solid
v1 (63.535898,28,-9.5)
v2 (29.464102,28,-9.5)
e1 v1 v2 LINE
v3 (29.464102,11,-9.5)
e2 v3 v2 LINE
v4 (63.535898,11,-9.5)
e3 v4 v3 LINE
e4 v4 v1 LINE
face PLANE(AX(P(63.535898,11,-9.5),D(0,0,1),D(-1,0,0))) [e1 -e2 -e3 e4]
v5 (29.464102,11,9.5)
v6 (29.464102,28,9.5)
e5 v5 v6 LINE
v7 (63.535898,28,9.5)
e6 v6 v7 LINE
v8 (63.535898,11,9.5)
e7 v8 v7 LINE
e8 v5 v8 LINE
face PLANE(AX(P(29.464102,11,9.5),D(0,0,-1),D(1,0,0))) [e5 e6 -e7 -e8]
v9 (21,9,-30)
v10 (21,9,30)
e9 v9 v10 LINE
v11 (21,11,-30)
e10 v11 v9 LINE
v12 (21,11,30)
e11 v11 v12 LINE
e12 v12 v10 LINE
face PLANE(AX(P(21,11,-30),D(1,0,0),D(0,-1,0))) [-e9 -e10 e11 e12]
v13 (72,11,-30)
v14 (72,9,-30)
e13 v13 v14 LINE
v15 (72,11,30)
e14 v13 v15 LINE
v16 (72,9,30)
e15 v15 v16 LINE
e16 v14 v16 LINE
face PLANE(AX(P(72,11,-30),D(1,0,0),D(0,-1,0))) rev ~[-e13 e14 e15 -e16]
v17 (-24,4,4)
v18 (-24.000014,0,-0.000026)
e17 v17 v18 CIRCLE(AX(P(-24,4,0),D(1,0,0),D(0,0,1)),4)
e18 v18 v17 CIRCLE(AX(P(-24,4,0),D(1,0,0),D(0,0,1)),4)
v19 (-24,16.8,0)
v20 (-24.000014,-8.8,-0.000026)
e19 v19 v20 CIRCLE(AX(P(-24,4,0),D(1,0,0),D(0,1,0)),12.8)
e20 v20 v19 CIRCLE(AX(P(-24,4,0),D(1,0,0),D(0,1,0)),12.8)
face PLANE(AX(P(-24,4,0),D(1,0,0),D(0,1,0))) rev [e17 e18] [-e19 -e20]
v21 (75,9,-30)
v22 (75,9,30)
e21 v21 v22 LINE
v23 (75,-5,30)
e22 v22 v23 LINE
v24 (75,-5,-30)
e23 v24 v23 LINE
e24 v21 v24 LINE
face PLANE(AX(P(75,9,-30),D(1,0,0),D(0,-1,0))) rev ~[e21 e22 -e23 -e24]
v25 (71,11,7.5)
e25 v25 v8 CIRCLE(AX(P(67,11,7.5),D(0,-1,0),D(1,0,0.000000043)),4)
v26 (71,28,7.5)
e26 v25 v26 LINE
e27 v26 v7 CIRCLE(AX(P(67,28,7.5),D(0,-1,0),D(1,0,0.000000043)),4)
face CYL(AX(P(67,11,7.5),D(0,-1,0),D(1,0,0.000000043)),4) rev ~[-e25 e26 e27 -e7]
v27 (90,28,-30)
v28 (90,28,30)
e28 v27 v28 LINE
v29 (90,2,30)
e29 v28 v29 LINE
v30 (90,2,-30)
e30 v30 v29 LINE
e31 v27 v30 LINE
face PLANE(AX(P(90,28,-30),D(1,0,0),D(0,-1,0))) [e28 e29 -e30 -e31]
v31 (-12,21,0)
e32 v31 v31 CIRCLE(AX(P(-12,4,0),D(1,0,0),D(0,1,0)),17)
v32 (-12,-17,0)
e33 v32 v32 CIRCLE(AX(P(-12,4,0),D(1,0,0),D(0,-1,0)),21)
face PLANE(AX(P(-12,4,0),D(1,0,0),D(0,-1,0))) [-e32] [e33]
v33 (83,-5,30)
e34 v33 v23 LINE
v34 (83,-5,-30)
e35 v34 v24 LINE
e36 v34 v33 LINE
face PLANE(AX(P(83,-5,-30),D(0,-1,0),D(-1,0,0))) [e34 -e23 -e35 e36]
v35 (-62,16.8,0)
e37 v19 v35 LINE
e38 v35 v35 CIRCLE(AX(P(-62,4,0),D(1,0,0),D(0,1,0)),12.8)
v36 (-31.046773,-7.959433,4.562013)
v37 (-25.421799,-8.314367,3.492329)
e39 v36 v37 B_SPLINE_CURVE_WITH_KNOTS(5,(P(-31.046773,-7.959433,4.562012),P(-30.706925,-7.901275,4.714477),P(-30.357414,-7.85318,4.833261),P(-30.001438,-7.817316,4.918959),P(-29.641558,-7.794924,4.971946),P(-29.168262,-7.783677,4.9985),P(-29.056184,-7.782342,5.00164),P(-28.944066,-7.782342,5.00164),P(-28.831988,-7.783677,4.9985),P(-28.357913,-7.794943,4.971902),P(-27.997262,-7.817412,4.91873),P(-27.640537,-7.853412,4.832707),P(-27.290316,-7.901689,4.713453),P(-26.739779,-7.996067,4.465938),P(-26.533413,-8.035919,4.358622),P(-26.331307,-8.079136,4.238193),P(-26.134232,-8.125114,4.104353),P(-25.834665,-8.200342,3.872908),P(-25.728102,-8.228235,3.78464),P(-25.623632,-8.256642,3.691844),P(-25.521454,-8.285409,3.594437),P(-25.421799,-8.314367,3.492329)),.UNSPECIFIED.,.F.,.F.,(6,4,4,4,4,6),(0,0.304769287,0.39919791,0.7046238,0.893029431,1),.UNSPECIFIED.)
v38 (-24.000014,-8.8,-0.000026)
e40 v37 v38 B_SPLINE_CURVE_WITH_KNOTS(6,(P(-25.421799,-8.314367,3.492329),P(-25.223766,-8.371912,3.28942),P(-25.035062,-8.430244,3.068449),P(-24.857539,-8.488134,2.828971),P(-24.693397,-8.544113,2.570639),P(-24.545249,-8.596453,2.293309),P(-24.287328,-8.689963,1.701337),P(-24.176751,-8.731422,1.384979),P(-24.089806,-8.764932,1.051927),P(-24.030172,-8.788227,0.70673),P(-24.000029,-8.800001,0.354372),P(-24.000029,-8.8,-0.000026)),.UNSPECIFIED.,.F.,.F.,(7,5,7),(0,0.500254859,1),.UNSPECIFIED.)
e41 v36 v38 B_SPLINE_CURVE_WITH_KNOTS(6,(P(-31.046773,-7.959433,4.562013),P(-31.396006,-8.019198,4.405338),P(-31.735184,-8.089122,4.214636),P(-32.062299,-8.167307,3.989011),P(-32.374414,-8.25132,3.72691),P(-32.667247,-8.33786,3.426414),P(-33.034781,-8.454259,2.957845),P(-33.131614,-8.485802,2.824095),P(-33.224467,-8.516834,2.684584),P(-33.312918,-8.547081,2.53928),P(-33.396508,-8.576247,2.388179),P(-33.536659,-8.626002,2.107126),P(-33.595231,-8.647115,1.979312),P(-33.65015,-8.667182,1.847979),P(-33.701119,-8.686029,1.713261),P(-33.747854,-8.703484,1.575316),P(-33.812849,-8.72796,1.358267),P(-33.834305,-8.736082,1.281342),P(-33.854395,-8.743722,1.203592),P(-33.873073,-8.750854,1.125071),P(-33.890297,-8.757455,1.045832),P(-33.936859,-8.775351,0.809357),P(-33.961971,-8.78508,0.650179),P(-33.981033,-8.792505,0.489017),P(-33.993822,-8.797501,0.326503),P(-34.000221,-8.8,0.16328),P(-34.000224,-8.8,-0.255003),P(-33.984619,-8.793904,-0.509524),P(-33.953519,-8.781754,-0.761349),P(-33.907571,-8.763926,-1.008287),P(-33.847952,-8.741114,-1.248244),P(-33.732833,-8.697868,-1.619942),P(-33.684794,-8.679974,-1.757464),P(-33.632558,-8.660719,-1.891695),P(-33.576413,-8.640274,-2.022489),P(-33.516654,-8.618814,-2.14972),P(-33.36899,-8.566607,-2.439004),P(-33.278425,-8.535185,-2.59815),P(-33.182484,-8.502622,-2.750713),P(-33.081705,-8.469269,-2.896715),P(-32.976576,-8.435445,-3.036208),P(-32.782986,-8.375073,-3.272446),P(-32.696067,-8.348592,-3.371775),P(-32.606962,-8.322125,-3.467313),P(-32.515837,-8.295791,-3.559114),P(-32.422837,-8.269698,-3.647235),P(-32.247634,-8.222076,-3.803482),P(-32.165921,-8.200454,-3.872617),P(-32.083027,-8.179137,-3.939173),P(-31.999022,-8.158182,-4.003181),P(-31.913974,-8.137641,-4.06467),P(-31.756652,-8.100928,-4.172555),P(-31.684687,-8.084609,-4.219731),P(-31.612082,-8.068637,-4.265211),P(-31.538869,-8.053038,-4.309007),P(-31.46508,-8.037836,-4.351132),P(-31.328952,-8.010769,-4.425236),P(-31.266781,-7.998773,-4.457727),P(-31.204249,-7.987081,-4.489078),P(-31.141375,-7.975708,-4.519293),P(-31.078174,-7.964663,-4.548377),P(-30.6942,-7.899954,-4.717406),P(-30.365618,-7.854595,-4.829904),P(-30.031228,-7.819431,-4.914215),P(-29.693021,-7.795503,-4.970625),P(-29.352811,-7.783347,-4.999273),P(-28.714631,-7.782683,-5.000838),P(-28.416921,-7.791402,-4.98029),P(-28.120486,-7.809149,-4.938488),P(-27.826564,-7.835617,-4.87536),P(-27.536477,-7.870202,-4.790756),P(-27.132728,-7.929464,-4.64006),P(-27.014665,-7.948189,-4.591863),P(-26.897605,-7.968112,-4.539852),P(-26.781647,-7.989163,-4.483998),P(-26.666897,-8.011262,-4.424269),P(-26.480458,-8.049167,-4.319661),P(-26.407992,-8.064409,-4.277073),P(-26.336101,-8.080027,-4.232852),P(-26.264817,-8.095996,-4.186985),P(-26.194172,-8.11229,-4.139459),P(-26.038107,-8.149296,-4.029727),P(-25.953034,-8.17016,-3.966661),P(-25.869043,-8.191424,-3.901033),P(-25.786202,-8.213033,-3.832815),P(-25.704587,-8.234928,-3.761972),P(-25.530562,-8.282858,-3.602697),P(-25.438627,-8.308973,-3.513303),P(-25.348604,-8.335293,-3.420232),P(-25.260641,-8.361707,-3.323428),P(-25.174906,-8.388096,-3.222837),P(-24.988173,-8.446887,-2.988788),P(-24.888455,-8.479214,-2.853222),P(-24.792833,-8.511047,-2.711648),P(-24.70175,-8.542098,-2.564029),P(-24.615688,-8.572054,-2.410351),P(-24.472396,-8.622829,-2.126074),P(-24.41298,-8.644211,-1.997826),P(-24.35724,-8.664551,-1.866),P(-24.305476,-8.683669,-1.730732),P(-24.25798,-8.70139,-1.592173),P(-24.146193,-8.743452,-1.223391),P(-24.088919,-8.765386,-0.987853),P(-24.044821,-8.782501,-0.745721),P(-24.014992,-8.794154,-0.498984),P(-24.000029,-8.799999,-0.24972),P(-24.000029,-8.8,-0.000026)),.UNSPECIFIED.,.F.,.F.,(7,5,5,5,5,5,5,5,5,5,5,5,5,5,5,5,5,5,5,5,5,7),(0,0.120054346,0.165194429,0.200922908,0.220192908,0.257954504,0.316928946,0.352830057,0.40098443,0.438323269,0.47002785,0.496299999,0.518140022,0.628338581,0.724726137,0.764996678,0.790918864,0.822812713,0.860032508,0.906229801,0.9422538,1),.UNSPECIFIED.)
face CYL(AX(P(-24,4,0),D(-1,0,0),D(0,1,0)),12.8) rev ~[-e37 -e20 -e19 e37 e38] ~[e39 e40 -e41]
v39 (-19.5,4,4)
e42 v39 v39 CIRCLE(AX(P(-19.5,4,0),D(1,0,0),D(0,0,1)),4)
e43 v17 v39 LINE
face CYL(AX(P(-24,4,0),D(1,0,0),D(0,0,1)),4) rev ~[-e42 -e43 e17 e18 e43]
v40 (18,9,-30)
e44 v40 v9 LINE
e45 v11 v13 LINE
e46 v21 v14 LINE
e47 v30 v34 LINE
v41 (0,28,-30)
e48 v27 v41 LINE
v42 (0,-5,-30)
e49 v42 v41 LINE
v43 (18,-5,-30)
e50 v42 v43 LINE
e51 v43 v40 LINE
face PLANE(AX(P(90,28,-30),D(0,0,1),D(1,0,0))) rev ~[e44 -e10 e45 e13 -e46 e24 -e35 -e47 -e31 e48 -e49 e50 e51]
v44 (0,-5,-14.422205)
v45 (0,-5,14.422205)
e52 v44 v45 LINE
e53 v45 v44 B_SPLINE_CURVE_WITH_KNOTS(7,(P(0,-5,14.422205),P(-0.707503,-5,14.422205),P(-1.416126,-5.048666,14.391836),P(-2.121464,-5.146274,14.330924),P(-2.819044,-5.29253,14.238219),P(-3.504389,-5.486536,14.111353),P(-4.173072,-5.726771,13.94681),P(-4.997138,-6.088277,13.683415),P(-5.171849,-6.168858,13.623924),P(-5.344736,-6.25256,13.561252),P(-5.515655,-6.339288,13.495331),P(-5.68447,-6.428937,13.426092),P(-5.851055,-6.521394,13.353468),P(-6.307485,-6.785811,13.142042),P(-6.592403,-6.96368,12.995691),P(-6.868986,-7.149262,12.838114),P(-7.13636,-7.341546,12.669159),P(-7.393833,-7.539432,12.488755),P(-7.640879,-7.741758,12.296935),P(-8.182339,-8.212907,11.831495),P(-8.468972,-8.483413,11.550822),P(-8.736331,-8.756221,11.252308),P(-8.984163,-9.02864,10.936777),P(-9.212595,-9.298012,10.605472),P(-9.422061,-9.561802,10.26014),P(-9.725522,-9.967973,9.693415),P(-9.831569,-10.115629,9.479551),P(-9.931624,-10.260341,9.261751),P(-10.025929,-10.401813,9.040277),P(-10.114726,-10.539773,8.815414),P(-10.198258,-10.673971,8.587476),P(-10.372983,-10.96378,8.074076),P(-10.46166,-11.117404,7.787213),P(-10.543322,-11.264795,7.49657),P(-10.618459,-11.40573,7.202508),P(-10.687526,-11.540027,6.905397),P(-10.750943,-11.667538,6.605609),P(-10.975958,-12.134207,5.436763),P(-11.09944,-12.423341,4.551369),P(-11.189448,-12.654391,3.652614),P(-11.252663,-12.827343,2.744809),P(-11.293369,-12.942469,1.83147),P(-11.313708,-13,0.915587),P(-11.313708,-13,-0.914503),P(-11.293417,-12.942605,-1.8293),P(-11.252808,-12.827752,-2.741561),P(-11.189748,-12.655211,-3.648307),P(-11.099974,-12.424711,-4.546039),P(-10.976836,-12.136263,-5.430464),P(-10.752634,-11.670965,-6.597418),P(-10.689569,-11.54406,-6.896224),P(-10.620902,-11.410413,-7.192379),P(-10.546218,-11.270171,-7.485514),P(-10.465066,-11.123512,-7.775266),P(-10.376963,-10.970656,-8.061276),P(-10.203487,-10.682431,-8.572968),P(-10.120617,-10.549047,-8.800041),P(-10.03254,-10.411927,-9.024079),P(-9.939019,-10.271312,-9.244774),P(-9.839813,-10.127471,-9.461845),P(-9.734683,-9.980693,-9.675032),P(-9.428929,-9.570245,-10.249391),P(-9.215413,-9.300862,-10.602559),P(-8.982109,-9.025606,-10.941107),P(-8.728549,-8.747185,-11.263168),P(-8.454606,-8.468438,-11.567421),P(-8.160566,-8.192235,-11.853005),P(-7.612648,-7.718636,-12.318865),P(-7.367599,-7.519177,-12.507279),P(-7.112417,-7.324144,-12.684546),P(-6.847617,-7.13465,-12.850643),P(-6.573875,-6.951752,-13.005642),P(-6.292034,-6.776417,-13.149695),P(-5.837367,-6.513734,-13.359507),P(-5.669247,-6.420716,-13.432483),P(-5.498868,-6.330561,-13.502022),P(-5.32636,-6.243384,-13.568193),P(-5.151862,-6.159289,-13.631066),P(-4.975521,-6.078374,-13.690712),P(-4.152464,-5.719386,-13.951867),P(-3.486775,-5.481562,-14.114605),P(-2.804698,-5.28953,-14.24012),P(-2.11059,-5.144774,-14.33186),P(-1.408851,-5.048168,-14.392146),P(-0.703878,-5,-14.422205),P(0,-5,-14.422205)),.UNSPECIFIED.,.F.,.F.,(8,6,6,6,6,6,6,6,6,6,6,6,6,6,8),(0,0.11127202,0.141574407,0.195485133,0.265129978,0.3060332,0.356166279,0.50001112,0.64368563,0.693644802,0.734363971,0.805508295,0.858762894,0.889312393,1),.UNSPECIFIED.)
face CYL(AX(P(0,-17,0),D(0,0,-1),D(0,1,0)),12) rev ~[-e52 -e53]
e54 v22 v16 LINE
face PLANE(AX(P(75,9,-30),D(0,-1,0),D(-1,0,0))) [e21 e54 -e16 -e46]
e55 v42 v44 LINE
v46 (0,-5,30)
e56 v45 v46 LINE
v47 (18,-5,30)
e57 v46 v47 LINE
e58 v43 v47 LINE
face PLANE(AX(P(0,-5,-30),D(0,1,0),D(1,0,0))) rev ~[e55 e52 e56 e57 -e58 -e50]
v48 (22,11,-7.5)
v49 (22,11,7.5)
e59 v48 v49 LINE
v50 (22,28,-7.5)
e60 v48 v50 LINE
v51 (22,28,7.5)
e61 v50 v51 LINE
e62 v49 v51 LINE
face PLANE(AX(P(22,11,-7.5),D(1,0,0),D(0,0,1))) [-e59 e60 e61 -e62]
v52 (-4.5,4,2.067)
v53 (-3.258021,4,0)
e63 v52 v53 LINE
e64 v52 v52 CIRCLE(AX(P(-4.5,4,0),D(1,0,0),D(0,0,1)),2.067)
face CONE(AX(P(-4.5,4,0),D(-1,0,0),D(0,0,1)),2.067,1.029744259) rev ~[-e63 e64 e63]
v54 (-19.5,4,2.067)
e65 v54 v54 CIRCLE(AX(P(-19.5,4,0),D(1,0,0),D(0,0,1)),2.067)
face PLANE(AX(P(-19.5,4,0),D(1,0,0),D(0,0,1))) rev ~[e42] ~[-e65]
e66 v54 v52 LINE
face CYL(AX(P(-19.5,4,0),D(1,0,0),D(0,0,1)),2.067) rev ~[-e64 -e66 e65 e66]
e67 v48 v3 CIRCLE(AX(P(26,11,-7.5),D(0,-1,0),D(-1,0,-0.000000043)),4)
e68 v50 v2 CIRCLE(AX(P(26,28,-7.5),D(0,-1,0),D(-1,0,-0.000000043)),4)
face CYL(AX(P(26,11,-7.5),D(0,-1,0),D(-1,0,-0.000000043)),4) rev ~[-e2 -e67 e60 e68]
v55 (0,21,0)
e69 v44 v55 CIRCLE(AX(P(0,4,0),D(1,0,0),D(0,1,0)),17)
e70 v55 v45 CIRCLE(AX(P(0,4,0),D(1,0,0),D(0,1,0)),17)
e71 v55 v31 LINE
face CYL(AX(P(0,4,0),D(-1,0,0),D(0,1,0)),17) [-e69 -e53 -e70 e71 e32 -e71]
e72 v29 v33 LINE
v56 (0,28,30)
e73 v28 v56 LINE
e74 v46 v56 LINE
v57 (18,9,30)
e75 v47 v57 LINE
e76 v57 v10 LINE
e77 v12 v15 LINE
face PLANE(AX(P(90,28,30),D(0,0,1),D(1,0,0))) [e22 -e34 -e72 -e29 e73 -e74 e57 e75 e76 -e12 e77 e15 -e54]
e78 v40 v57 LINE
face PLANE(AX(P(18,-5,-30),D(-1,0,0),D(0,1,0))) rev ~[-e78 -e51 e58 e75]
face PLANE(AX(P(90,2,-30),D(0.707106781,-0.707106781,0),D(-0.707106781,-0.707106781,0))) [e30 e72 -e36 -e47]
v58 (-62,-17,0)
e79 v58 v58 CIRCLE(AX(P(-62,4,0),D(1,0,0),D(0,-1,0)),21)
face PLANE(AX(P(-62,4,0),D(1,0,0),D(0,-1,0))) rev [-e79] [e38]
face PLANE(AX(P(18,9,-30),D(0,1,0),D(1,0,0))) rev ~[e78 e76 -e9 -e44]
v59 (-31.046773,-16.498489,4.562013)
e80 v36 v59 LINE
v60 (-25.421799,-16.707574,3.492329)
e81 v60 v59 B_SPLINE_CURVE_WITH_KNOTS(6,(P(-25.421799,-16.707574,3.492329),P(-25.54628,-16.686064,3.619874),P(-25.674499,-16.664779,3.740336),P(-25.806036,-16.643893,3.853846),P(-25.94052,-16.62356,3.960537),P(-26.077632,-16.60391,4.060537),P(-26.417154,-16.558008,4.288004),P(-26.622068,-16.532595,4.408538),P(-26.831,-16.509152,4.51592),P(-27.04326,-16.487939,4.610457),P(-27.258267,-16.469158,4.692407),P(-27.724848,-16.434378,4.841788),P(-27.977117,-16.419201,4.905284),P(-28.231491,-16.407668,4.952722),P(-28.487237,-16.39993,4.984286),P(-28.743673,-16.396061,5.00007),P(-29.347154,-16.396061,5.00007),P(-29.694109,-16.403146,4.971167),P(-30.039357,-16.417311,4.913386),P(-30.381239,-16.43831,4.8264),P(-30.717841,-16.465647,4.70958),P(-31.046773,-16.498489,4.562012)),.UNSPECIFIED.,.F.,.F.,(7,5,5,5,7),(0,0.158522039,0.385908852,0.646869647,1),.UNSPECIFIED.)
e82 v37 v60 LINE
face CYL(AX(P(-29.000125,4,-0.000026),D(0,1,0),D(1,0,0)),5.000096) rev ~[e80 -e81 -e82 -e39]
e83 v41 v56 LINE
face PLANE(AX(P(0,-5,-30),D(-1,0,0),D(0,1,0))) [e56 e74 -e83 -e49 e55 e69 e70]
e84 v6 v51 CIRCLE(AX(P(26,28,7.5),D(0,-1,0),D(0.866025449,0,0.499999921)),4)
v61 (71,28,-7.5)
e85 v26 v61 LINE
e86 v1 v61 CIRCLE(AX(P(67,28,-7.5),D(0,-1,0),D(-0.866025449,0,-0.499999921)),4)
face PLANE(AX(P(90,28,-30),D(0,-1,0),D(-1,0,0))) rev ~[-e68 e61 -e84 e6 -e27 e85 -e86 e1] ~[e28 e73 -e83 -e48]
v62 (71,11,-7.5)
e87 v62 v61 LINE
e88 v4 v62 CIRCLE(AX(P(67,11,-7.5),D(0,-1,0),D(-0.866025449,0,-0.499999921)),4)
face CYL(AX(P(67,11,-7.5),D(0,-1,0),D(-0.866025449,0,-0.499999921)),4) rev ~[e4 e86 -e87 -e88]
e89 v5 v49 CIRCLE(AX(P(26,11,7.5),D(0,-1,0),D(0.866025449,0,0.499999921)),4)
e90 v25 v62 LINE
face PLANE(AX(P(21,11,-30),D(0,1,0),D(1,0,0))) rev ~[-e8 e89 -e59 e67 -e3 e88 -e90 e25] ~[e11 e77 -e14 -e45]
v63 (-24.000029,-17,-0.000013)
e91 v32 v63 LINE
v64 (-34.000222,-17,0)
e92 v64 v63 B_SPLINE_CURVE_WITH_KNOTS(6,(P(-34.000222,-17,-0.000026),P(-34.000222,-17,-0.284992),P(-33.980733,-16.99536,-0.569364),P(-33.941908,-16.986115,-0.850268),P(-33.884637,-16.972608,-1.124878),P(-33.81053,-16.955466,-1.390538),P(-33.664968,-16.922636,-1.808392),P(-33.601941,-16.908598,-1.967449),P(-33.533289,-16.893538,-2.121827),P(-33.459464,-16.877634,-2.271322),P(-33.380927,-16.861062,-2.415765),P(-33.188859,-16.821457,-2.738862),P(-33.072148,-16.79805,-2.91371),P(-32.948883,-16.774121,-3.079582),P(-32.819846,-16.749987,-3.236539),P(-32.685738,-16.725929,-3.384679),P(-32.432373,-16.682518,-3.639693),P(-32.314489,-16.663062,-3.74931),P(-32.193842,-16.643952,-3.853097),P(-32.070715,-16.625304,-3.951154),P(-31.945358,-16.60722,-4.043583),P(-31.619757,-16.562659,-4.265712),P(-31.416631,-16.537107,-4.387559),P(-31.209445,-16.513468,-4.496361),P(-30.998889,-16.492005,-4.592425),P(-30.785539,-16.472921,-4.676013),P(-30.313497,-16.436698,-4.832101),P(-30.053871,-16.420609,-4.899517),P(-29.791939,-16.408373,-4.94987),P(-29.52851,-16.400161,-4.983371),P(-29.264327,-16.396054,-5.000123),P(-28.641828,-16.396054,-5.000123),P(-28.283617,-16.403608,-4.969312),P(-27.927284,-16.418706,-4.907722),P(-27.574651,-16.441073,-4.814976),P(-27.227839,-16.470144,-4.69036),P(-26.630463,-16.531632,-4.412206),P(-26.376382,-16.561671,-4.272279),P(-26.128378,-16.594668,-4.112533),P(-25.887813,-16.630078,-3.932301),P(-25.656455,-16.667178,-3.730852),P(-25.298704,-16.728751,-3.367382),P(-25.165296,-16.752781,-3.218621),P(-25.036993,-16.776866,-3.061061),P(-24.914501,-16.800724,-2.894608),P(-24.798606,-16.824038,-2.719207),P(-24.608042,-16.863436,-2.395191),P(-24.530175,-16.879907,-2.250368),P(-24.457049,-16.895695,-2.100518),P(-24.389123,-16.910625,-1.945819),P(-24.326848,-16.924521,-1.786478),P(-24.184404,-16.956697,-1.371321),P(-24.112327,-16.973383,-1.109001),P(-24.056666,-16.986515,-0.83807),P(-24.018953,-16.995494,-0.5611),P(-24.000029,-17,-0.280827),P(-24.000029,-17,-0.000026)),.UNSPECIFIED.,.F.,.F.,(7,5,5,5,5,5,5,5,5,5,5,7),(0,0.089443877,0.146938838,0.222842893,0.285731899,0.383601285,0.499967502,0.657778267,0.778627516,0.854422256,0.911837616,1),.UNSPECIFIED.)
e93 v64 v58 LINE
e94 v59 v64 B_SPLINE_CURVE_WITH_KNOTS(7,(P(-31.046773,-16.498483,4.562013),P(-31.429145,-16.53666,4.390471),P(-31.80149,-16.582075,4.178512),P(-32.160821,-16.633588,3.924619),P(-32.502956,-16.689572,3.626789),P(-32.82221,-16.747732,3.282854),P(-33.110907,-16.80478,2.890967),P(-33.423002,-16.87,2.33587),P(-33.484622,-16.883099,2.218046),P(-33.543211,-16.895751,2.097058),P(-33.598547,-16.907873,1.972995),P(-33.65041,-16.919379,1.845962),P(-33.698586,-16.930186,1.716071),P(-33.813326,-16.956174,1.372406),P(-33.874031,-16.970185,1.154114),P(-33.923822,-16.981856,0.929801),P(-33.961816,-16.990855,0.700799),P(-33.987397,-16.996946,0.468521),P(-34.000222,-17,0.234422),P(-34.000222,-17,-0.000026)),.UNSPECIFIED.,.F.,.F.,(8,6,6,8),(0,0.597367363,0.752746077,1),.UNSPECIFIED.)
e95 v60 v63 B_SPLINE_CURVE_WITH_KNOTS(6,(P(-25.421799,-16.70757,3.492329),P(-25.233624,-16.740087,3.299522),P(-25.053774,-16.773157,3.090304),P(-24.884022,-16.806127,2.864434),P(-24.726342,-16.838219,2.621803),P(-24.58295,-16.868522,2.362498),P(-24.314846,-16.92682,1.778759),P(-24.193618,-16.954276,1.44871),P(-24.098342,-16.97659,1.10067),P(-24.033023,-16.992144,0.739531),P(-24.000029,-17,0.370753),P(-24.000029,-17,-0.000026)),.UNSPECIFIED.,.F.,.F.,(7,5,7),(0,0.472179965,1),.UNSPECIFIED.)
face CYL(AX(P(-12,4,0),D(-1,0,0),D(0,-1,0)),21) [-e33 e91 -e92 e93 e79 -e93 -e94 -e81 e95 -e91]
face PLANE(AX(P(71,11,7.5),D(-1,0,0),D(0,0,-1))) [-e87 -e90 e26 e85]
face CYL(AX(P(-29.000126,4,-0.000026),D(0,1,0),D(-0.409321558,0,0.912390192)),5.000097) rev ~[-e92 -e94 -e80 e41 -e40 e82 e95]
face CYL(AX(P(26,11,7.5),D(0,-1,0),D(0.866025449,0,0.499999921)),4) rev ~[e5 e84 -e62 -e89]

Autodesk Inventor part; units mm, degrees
ref_plane "Plan de construction1" through (90, 28, -30) normal (0, 0, 1) x (1, 0, 0)
sketch "Esquisse1" plane through (90, 28, -30) normal (0, 0, 1) x (1, 0, 0)
  line L0 (0, 0) -> (-90, 0)
  line L1 (0, 0) -> (0, -26)
  line L2 (0, -26) -> (-7, -33)
  line L3 (-7, -33) -> (-15, -33)
  line L4 (-15, -19) -> (-15, -33)
  line L5 (-15, -19) -> (-18, -19)
  line L6 (-69, -17) -> (-18, -17)
  line L7 (-72, -19) -> (-69, -19)
  line L8 (-72, -33) -> (-72, -19)
  line L9 (-90, -33) -> (-72, -33)
  line L10 (-90, -33) -> (-90, 0)
  line L11 (-69, -17) -> (-69, -19)
  line L12 (-18, -17) -> (-18, -19)
  dimension "d10" = 17
  dimension "d11" = 16
  dimension "d12" = 18
  dimension "d13" = 15
  dimension "d14" = 3
  dimension "d15" = 2
  dimension "d17" = 3
  dimension "d18" = 2
  dimension "d19" = 51
extrude "Extrusion1" add sketch "Esquisse1" along normal blind 60
sketch "Esquisse2" plane through (21, 11, -30) normal (0, -1, 0) x (1, 0, 0)
  line L0 (42.535898, 20.5) -> (8.464102, 20.5)
  line L1 (8.464102, 39.5) -> (42.535898, 39.5)
  arc A0 (50, 37.5) -> (42.535898, 39.5) centre (46, 37.5) ccw
  arc A1 (42.535898, 20.5) -> (50, 22.5) centre (46, 22.5) ccw
  line L2 (50, 37.5) -> (50, 22.5)
  arc A2 (8.464102, 39.5) -> (1, 37.5) centre (5, 37.5) ccw
  line L3 (1, 22.5) -> (1, 37.5)
  arc A3 (1, 22.5) -> (8.464102, 20.5) centre (5, 22.5) ccw
  line L4 (51, 60) -> (0, 60)
  line L5 (0, 0) -> (0, 60)
  line L6 (0, 0) -> (51, 0)
  line L7 (51, 0) -> (51, 60)
extrude "Extrusion2" cut sketch "Esquisse2" against normal through all contours L0 A3 L3 A2 L1 A0 L2 A1
ref_plane "Plan de construction2" through (18, -5, 0) normal (0, 0, 1) x (1, 0, 0)
sketch "Esquisse3" plane through (18, -5, 0) normal (0, 0, 1) x (1, 0, 0)
  line L0 (-80, 34) -> (-80, -16)
  line L1 (-42, -7.5) -> (-42, 21.8)
  line L2 (-80, 9) -> (-42, 9)
  line L3 (-42, 9) -> (-42, 21.8)
  line L4 (-42, 21.8) -> (-80, 21.8)
  line L5 (-80, 21.8) -> (-80, 9)
  line L6 (-30, -12) -> (-30, 26)
  line L7 (-80, 9) -> (-30, 9)
  line L8 (-30, 9) -> (-30, -12)
  line L9 (-30, -12) -> (-80, -12)
  line L10 (-80, -12) -> (-80, 9)
  line L11 (-18, 0) -> (-18, 26)
  line L12 (-30, 9) -> (-18, 9)
  line L13 (-18, 9) -> (-18, 26)
  line L14 (-18, 26) -> (-30, 26)
  line L15 (-30, 26) -> (-30, 9)
  line L16 (0, 14) -> (0, 0)
  line L17 (0, 7) -> (-22.134302, 7)
  line L18 (-18, 0) -> (-18, 33)
  dimension "d20" = 21
  dimension "d21" = 12.8
  dimension "d22" = 12
  dimension "d23" = 62
  dimension "d24" = 17
  dimension "d29" = 2
  dimension "d30" = 38
revolve "Révolution1" add sketch "Esquisse3" angle 360 about axis through (-62, 4, 0) along (1, 0, 0) contours L6 L14 L11 L12 | L2 L7 L6 L9 L0
revolve "Révolution2" cut sketch "Esquisse3" angle 360 about axis through (-62, 4, 0) along (1, 0, 0) contours L4 L1 L2 L0
sketch "Esquisse5" plane through (18, -5, 0) normal (0, 0, 1) x (1, 0, 0)
  arc A0 (-18, 0) -> (-30, -12) centre (-18, -12) ccw
  line L0 (-18, 0) -> (-18, 0)
  line L1 (-30, 9) -> (-18, 9) projected
  line L2 (-18, -8) -> (-18, 0) projected
  line L3 (-18, -12) -> (-30, -12)
  line L4 (-18, 0) -> (0, 0) projected
  line L5 (-30, -8) -> (-30, 26) projected
  dimension "d31" = 12
sketch "Esquisse5 outline for Extrusion3" plane through (18, -5, 0) normal (0, 0, 1) x (1, 0, 0)
  arc A0 (-18, 0) -> (-30, -12) centre (-18, -12) ccw
  line L0 (-18, -8) -> (-18, 0)
  line L1 (-30, -12) -> (-18, -8)
extrude "Extrusion3" cut sketch "Esquisse5 outline for Extrusion3" along normal through all both and the other way through all
ref_plane "Plan de construction3" through (-37, 4, 0) normal (0, -1, 0) x (1, 0, 0)
sketch "Esquisse6" plane through (-37, 4, 0) normal (0, -1, 0) x (1, 0, 0)
  arc A0 (5.953227, 4.562013) -> (11.578201, 3.492329) centre (7.999875, -0.000026) ccw
  circle A1 centre (7.999875, -0.000026) radius 5.000096
  dimension "d26" = 5.0001
extrude "Extrusion4" cut sketch "Esquisse6" along normal through all
sketch "Esquisse7" plane through (-24, 4, 0) normal (-1, 0, 0) x (0, 0, 1)
  circle A0 centre (0, 0) radius 12.8 projected
hole "Perçage1" at (-24, 4, 0) direction (1, 0, 0) diameter 4.134 depth 19.5 tip angle 118 counterbore diameter 8 counterbore depth 4.5 thread size "M5x0.8" class "6H" standard "ISO Metric profile"
sketch "Esquisse8" plane through (-24, 4, 0) normal (-1, 0, 0) x (0, 0, 1)
  circle A0 centre (0, 0) radius 4 projected
  circle A1 centre (0, 0) radius 12.8 projected
  line L0 (-12.8, 0) -> (12.8, 0)
properties part number "crosse" material "Acier doux"
